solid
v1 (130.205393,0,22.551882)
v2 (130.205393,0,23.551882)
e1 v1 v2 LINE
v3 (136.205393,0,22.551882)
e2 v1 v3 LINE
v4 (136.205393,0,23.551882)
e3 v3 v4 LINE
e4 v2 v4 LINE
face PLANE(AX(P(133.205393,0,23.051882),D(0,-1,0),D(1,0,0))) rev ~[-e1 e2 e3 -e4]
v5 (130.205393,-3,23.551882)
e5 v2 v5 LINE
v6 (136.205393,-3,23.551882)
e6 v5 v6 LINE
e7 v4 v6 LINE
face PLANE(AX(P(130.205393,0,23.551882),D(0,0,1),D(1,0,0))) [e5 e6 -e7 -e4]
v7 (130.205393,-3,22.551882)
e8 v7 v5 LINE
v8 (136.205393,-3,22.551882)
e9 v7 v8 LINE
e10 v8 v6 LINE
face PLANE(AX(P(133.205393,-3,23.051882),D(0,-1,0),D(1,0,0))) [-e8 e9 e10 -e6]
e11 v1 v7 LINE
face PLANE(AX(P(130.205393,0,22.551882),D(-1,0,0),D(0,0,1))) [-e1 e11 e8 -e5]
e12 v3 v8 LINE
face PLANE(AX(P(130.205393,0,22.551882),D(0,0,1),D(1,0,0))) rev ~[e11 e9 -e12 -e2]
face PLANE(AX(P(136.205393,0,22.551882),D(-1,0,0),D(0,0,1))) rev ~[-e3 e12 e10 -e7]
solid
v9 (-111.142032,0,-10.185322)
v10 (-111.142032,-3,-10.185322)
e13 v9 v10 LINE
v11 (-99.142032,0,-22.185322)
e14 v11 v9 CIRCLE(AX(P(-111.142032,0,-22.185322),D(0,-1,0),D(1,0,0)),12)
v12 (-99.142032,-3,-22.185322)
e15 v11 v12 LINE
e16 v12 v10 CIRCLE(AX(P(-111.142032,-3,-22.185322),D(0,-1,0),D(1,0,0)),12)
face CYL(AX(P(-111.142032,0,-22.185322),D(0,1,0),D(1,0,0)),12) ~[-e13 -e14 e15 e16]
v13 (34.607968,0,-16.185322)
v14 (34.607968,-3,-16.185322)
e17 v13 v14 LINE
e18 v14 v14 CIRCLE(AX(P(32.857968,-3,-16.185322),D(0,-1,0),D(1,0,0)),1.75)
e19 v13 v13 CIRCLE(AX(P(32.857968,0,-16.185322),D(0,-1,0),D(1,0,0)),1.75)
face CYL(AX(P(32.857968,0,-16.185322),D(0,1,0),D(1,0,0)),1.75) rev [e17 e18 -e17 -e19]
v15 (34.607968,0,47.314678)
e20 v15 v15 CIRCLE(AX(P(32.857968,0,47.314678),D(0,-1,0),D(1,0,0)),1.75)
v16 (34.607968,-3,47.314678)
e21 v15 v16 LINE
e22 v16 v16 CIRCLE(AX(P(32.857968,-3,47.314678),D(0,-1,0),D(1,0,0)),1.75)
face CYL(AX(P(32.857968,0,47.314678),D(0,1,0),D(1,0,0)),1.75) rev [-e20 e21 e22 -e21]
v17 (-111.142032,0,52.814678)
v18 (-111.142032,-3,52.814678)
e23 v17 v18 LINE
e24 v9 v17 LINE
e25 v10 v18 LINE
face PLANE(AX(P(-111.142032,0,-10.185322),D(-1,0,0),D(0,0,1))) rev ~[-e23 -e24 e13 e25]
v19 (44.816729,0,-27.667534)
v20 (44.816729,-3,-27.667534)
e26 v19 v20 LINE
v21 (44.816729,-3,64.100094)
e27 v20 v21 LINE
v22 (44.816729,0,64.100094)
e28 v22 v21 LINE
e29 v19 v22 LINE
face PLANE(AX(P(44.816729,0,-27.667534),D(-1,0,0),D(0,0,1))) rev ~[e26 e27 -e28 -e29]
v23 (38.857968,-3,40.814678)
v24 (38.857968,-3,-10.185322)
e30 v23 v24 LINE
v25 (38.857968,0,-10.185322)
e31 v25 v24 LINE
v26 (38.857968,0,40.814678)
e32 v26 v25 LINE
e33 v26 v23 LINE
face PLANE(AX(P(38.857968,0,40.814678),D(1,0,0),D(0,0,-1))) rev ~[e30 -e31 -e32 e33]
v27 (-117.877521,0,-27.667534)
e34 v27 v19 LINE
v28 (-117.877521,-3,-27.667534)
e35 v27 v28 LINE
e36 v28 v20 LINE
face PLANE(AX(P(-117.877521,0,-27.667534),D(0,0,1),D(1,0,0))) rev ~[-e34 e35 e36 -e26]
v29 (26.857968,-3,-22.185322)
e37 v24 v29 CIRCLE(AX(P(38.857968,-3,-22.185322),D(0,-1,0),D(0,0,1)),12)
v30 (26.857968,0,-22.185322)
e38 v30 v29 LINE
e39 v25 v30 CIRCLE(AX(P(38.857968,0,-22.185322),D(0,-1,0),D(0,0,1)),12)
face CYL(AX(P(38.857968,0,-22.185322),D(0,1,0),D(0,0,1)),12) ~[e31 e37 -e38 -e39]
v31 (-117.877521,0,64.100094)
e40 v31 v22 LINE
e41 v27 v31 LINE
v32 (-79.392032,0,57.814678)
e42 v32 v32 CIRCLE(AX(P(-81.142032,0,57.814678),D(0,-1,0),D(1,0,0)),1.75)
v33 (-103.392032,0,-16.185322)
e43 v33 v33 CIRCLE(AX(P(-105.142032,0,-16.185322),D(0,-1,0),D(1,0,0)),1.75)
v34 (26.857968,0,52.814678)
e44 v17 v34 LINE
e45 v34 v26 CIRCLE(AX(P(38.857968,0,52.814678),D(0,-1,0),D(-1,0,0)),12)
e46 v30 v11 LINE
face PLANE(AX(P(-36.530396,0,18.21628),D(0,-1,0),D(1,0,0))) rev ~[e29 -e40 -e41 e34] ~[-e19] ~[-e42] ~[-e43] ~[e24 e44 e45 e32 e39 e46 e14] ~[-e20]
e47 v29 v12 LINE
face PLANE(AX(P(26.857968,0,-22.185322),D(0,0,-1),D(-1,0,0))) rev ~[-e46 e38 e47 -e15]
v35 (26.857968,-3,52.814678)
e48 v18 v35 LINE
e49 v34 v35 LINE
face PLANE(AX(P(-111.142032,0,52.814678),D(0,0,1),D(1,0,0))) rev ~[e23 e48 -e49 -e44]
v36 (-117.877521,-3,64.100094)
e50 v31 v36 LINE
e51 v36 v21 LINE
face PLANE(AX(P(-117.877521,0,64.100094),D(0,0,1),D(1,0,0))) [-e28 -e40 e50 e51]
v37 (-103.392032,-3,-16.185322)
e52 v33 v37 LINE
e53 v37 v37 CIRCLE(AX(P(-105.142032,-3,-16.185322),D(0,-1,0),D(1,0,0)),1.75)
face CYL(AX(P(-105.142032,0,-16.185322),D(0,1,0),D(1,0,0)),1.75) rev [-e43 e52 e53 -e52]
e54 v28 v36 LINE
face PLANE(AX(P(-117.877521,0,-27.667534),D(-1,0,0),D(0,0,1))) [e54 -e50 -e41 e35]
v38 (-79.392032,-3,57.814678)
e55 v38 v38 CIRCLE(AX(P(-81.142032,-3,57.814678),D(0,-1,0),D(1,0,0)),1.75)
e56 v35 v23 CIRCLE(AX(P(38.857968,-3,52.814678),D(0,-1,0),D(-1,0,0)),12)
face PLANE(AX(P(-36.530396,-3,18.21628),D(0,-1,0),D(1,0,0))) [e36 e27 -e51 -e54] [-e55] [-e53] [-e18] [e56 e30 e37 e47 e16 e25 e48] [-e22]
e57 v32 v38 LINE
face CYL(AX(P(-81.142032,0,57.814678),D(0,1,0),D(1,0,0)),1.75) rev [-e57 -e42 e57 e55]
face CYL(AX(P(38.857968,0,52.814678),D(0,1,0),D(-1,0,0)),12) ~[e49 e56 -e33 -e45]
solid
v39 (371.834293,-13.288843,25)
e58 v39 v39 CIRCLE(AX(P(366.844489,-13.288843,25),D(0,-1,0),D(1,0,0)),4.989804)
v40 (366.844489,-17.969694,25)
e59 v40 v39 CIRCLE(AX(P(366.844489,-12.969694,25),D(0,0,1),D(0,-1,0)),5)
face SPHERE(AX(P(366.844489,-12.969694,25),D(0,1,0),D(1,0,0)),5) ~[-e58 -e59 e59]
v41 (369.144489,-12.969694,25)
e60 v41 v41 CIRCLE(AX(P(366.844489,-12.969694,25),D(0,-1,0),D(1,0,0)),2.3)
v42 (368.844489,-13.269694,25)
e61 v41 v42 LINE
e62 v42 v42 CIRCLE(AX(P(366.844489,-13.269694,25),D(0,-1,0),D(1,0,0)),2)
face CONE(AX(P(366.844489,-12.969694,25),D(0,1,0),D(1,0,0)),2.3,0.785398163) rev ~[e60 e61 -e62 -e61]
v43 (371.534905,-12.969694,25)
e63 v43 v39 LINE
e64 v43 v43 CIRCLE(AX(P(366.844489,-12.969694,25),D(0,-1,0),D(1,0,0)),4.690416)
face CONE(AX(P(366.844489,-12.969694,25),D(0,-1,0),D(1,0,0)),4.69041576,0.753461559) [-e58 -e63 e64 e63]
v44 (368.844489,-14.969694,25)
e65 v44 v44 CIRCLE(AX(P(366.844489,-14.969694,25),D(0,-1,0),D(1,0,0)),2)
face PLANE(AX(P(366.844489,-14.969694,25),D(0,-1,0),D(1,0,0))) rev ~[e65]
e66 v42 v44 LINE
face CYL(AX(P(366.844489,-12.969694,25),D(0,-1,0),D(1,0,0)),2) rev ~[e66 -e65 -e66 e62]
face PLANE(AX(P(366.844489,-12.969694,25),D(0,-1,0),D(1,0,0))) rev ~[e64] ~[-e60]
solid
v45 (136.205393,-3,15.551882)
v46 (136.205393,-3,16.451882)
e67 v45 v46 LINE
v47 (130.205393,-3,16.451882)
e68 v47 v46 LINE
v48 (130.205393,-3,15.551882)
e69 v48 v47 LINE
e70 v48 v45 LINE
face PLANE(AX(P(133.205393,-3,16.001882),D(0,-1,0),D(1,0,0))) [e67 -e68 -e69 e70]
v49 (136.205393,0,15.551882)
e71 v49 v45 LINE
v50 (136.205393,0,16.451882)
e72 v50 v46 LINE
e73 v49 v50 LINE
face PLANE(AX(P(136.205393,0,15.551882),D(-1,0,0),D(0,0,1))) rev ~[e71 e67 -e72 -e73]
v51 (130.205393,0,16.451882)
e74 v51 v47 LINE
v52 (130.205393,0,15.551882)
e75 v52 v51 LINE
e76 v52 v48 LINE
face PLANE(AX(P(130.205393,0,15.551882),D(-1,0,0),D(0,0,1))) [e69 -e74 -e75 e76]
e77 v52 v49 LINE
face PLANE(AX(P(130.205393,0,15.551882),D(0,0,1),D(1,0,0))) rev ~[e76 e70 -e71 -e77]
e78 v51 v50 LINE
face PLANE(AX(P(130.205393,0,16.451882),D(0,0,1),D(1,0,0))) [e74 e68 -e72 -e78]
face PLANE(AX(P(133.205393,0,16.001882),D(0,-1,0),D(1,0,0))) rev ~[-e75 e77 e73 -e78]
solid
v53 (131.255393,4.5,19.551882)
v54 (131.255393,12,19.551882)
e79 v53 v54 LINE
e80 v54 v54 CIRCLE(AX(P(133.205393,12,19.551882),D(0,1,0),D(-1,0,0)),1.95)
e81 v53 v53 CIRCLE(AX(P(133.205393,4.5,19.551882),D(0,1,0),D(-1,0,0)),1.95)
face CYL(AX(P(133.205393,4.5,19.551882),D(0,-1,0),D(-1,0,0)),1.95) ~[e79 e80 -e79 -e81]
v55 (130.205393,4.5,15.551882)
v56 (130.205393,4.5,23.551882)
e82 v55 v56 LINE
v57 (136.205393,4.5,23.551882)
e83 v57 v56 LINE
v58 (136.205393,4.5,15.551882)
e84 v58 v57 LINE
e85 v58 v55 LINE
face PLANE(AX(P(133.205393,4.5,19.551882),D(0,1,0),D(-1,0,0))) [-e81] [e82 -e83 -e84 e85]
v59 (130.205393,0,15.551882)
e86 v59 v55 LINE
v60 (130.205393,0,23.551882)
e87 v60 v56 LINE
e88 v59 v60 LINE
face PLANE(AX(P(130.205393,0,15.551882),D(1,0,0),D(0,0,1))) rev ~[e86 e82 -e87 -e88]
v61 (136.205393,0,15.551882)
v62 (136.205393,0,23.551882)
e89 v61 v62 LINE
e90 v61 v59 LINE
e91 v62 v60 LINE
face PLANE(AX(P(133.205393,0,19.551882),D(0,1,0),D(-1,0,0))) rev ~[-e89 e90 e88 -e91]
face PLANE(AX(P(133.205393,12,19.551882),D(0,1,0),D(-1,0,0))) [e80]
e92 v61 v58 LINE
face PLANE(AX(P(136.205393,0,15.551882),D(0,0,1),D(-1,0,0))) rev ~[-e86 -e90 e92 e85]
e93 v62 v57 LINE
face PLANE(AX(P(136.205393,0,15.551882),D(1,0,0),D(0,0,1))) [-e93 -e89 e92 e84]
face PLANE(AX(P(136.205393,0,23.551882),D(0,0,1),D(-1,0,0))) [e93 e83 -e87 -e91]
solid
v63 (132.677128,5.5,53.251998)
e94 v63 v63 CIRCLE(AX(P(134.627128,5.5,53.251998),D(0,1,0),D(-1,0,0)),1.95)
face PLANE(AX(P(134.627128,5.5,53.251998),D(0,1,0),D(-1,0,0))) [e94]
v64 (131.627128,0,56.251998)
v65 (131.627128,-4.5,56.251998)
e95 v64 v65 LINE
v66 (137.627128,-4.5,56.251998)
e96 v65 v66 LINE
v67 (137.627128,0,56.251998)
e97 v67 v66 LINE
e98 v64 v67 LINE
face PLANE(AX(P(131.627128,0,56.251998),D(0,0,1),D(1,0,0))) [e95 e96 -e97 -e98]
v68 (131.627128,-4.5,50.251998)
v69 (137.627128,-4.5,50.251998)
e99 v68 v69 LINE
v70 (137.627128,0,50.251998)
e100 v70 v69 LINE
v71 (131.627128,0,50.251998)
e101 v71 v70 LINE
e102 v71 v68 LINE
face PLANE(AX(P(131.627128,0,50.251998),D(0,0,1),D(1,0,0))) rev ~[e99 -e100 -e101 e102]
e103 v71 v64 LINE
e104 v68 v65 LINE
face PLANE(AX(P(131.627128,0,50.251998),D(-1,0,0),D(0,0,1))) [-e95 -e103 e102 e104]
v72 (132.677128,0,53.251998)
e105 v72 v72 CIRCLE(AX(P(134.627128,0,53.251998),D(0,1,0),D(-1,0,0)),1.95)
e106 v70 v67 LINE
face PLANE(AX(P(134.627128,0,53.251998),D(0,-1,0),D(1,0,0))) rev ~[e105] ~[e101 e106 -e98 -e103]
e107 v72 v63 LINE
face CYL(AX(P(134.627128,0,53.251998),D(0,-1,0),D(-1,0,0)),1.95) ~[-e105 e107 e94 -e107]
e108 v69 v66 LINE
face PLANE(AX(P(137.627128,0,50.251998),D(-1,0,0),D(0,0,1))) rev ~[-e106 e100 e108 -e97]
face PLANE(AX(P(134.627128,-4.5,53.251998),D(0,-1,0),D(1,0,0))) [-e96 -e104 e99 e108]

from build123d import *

# Parameters (mm, degrees)
F0_W      = 162.6942493021
F0_H      = 91.7676277459
F0_R      = 1.75
F1_DEPTH  = 3
F2_W      = 6
F2_H      = 6
F3_DEPTH  = 4.5
F4_R      = 1.95
F5_DEPTH  = 5.5
F6_W      = 6
F6_H      = 1
F7_DEPTH  = 3
F6_H_2    = 0.9
F8_W      = 6
F8_H      = 8
F9_DEPTH  = 4.5
F10_R     = 1.95
F11_DEPTH = 7.5


# Not quite as in the source:
# - a fillet or chamfer that OpenCascade refuses, or shapes differently, is made with other operations: its cross-section is extruded or revolved along the edge and cut away or added


with BuildPart() as f1:
    # F0 (on Front) → F1 (new body)
    with BuildSketch(Plane.XZ):
        with Locations((-36.5303959697, 18.2162802666)):
            Rectangle(F0_W, F0_H)
        with Locations((-105.142032113, -16.1853220011)):
            Circle(F0_R, mode=Mode.SUBTRACT)
        with Locations((32.857967887, -16.1853220011)):
            Circle(F0_R, mode=Mode.SUBTRACT)
        with BuildLine():
            Line((-111.142032113, -10.1853220011), (-111.142032113, 52.8146779989))
            Line((-111.142032113, 52.8146779989), (26.857967887, 52.8146779989))
            ThreePointArc((26.857967887, 52.8146779989), (30.3726865127, 44.3293966246), (38.857967887, 40.8146779989))
            Line((38.857967887, 40.8146779989), (38.857967887, -10.1853220011))
            ThreePointArc((38.857967887, -10.1853220011), (30.3726865127, -13.7000406269), (26.857967887, -22.1853220011))
            Line((26.857967887, -22.1853220011), (-99.142032113, -22.1853220011))
            ThreePointArc((-99.142032113, -22.1853220011), (-102.6567507388, -13.7000406269), (-111.142032113, -10.1853220011))
        make_face(mode=Mode.SUBTRACT)
        with Locations((-81.142032113, 57.8146779989)):
            Circle(F0_R, mode=Mode.SUBTRACT)
        with Locations((32.857967887, 47.3146779989)):
            Circle(F0_R, mode=Mode.SUBTRACT)
    extrude(amount=F1_DEPTH)


with BuildPart() as f3:
    # F2 (on Front) → F3 (new body)
    with BuildSketch(Plane.XZ):
        with Locations((134.6271275282, 53.2519980073)):
            Rectangle(F2_W, F2_H)
    extrude(amount=F3_DEPTH)

    # F4 (on face) → F5 (join)
    with BuildSketch(Plane(origin=(0, 0, 0), x_dir=(-1, 0, 0), z_dir=(0, 1, 0))):
        with Locations((-134.6271275282, 53.2519980073)):
            Circle(F4_R)
    extrude(amount=F5_DEPTH)


with BuildPart() as f7:
    # F6 (on Front) → F7 (new body)
    with BuildSketch(Plane.XZ):
        with Locations((133.2053928375, 23.0518818647)):
            Rectangle(F6_W, F6_H)
    extrude(amount=F7_DEPTH)


with BuildPart() as f7b:
    # F6 (on Front) → F7, piece 2 (new body)
    with BuildSketch(Plane.XZ):
        with Locations((133.2053928375, 16.0018818647)):
            Rectangle(F6_W, F6_H_2)
    extrude(amount=F7_DEPTH)


with BuildPart() as f9:
    # F8 (on face) → F9 (new body)
    with BuildSketch(Plane(origin=(0, 0, 0), x_dir=(-1, 0, 0), z_dir=(0, 1, 0))):
        with Locations((-133.2053928375, 19.5518818647)):
            Rectangle(F8_W, F8_H)
    extrude(amount=F9_DEPTH)

    # F10 (on face) → F11 (join)
    with BuildSketch(Plane(origin=(0, 4.5, 0), x_dir=(-1, 0, 0), z_dir=(0, 1, 0))):
        with Locations((-133.2053928375, 19.5518818647)):
            Circle(F10_R)
    extrude(amount=F11_DEPTH)


with BuildPart() as f14:
    # F13 (on face) → F14 (revolve)
    with BuildSketch(Plane.XY.offset(25)):
        with BuildLine():
            Line((366.844489096, -14.9696936347), (366.844489096, -17.9696936347))
            ThreePointArc((366.844489096, -17.9696936347), (370.3800230019, -16.5052275406), (371.844489096, -12.9696936347))
            Line((371.844489096, -12.9696936347), (368.844489096, -12.9696936347))
            Line((368.844489096, -12.9696936347), (368.844489096, -14.9696936347))
            Line((368.844489096, -14.9696936347), (366.844489096, -14.9696936347))
        make_face()
    revolve(axis=Axis((366.844489096, -20.7170091908, 25), (0, -1, 0)))

    # F15: chamfer of 0.3 on 2 edges, made by hand

    # F15_s1 → F15_t2 (revolve, cut)
    with BuildSketch(Plane.XY.offset(25)):
        Polygon((369.144489096, -12.9696936347), (368.844489096, -13.2696936347), (368.844489096, -12.9696936347), align=None)
    revolve(axis=Axis((366.844489096, -12.9696936347, 25), (0, -1, 0)), mode=Mode.SUBTRACT)

    # F15_s3 → F15_t4 (revolve, cut)
    with BuildSketch(Plane.XY.offset(25)):
        with BuildLine():
            Line((371.5349048558, -12.9696936347), (371.8342930958, -13.2888425708))
            ThreePointArc((371.8342930958, -13.2888425708), (371.8418022214, -13.133588499), (371.844489096, -12.9696936347))
            Line((371.844489096, -12.9696936347), (371.5349048558, -12.9696936347))
        make_face()
    revolve(axis=Axis((366.844489096, -12.9696936347, 25), (0, -1, 0)), mode=Mode.SUBTRACT)


solid = Compound([f1.part, f3.part, f7.part, f7b.part, f9.part, f14.part])
